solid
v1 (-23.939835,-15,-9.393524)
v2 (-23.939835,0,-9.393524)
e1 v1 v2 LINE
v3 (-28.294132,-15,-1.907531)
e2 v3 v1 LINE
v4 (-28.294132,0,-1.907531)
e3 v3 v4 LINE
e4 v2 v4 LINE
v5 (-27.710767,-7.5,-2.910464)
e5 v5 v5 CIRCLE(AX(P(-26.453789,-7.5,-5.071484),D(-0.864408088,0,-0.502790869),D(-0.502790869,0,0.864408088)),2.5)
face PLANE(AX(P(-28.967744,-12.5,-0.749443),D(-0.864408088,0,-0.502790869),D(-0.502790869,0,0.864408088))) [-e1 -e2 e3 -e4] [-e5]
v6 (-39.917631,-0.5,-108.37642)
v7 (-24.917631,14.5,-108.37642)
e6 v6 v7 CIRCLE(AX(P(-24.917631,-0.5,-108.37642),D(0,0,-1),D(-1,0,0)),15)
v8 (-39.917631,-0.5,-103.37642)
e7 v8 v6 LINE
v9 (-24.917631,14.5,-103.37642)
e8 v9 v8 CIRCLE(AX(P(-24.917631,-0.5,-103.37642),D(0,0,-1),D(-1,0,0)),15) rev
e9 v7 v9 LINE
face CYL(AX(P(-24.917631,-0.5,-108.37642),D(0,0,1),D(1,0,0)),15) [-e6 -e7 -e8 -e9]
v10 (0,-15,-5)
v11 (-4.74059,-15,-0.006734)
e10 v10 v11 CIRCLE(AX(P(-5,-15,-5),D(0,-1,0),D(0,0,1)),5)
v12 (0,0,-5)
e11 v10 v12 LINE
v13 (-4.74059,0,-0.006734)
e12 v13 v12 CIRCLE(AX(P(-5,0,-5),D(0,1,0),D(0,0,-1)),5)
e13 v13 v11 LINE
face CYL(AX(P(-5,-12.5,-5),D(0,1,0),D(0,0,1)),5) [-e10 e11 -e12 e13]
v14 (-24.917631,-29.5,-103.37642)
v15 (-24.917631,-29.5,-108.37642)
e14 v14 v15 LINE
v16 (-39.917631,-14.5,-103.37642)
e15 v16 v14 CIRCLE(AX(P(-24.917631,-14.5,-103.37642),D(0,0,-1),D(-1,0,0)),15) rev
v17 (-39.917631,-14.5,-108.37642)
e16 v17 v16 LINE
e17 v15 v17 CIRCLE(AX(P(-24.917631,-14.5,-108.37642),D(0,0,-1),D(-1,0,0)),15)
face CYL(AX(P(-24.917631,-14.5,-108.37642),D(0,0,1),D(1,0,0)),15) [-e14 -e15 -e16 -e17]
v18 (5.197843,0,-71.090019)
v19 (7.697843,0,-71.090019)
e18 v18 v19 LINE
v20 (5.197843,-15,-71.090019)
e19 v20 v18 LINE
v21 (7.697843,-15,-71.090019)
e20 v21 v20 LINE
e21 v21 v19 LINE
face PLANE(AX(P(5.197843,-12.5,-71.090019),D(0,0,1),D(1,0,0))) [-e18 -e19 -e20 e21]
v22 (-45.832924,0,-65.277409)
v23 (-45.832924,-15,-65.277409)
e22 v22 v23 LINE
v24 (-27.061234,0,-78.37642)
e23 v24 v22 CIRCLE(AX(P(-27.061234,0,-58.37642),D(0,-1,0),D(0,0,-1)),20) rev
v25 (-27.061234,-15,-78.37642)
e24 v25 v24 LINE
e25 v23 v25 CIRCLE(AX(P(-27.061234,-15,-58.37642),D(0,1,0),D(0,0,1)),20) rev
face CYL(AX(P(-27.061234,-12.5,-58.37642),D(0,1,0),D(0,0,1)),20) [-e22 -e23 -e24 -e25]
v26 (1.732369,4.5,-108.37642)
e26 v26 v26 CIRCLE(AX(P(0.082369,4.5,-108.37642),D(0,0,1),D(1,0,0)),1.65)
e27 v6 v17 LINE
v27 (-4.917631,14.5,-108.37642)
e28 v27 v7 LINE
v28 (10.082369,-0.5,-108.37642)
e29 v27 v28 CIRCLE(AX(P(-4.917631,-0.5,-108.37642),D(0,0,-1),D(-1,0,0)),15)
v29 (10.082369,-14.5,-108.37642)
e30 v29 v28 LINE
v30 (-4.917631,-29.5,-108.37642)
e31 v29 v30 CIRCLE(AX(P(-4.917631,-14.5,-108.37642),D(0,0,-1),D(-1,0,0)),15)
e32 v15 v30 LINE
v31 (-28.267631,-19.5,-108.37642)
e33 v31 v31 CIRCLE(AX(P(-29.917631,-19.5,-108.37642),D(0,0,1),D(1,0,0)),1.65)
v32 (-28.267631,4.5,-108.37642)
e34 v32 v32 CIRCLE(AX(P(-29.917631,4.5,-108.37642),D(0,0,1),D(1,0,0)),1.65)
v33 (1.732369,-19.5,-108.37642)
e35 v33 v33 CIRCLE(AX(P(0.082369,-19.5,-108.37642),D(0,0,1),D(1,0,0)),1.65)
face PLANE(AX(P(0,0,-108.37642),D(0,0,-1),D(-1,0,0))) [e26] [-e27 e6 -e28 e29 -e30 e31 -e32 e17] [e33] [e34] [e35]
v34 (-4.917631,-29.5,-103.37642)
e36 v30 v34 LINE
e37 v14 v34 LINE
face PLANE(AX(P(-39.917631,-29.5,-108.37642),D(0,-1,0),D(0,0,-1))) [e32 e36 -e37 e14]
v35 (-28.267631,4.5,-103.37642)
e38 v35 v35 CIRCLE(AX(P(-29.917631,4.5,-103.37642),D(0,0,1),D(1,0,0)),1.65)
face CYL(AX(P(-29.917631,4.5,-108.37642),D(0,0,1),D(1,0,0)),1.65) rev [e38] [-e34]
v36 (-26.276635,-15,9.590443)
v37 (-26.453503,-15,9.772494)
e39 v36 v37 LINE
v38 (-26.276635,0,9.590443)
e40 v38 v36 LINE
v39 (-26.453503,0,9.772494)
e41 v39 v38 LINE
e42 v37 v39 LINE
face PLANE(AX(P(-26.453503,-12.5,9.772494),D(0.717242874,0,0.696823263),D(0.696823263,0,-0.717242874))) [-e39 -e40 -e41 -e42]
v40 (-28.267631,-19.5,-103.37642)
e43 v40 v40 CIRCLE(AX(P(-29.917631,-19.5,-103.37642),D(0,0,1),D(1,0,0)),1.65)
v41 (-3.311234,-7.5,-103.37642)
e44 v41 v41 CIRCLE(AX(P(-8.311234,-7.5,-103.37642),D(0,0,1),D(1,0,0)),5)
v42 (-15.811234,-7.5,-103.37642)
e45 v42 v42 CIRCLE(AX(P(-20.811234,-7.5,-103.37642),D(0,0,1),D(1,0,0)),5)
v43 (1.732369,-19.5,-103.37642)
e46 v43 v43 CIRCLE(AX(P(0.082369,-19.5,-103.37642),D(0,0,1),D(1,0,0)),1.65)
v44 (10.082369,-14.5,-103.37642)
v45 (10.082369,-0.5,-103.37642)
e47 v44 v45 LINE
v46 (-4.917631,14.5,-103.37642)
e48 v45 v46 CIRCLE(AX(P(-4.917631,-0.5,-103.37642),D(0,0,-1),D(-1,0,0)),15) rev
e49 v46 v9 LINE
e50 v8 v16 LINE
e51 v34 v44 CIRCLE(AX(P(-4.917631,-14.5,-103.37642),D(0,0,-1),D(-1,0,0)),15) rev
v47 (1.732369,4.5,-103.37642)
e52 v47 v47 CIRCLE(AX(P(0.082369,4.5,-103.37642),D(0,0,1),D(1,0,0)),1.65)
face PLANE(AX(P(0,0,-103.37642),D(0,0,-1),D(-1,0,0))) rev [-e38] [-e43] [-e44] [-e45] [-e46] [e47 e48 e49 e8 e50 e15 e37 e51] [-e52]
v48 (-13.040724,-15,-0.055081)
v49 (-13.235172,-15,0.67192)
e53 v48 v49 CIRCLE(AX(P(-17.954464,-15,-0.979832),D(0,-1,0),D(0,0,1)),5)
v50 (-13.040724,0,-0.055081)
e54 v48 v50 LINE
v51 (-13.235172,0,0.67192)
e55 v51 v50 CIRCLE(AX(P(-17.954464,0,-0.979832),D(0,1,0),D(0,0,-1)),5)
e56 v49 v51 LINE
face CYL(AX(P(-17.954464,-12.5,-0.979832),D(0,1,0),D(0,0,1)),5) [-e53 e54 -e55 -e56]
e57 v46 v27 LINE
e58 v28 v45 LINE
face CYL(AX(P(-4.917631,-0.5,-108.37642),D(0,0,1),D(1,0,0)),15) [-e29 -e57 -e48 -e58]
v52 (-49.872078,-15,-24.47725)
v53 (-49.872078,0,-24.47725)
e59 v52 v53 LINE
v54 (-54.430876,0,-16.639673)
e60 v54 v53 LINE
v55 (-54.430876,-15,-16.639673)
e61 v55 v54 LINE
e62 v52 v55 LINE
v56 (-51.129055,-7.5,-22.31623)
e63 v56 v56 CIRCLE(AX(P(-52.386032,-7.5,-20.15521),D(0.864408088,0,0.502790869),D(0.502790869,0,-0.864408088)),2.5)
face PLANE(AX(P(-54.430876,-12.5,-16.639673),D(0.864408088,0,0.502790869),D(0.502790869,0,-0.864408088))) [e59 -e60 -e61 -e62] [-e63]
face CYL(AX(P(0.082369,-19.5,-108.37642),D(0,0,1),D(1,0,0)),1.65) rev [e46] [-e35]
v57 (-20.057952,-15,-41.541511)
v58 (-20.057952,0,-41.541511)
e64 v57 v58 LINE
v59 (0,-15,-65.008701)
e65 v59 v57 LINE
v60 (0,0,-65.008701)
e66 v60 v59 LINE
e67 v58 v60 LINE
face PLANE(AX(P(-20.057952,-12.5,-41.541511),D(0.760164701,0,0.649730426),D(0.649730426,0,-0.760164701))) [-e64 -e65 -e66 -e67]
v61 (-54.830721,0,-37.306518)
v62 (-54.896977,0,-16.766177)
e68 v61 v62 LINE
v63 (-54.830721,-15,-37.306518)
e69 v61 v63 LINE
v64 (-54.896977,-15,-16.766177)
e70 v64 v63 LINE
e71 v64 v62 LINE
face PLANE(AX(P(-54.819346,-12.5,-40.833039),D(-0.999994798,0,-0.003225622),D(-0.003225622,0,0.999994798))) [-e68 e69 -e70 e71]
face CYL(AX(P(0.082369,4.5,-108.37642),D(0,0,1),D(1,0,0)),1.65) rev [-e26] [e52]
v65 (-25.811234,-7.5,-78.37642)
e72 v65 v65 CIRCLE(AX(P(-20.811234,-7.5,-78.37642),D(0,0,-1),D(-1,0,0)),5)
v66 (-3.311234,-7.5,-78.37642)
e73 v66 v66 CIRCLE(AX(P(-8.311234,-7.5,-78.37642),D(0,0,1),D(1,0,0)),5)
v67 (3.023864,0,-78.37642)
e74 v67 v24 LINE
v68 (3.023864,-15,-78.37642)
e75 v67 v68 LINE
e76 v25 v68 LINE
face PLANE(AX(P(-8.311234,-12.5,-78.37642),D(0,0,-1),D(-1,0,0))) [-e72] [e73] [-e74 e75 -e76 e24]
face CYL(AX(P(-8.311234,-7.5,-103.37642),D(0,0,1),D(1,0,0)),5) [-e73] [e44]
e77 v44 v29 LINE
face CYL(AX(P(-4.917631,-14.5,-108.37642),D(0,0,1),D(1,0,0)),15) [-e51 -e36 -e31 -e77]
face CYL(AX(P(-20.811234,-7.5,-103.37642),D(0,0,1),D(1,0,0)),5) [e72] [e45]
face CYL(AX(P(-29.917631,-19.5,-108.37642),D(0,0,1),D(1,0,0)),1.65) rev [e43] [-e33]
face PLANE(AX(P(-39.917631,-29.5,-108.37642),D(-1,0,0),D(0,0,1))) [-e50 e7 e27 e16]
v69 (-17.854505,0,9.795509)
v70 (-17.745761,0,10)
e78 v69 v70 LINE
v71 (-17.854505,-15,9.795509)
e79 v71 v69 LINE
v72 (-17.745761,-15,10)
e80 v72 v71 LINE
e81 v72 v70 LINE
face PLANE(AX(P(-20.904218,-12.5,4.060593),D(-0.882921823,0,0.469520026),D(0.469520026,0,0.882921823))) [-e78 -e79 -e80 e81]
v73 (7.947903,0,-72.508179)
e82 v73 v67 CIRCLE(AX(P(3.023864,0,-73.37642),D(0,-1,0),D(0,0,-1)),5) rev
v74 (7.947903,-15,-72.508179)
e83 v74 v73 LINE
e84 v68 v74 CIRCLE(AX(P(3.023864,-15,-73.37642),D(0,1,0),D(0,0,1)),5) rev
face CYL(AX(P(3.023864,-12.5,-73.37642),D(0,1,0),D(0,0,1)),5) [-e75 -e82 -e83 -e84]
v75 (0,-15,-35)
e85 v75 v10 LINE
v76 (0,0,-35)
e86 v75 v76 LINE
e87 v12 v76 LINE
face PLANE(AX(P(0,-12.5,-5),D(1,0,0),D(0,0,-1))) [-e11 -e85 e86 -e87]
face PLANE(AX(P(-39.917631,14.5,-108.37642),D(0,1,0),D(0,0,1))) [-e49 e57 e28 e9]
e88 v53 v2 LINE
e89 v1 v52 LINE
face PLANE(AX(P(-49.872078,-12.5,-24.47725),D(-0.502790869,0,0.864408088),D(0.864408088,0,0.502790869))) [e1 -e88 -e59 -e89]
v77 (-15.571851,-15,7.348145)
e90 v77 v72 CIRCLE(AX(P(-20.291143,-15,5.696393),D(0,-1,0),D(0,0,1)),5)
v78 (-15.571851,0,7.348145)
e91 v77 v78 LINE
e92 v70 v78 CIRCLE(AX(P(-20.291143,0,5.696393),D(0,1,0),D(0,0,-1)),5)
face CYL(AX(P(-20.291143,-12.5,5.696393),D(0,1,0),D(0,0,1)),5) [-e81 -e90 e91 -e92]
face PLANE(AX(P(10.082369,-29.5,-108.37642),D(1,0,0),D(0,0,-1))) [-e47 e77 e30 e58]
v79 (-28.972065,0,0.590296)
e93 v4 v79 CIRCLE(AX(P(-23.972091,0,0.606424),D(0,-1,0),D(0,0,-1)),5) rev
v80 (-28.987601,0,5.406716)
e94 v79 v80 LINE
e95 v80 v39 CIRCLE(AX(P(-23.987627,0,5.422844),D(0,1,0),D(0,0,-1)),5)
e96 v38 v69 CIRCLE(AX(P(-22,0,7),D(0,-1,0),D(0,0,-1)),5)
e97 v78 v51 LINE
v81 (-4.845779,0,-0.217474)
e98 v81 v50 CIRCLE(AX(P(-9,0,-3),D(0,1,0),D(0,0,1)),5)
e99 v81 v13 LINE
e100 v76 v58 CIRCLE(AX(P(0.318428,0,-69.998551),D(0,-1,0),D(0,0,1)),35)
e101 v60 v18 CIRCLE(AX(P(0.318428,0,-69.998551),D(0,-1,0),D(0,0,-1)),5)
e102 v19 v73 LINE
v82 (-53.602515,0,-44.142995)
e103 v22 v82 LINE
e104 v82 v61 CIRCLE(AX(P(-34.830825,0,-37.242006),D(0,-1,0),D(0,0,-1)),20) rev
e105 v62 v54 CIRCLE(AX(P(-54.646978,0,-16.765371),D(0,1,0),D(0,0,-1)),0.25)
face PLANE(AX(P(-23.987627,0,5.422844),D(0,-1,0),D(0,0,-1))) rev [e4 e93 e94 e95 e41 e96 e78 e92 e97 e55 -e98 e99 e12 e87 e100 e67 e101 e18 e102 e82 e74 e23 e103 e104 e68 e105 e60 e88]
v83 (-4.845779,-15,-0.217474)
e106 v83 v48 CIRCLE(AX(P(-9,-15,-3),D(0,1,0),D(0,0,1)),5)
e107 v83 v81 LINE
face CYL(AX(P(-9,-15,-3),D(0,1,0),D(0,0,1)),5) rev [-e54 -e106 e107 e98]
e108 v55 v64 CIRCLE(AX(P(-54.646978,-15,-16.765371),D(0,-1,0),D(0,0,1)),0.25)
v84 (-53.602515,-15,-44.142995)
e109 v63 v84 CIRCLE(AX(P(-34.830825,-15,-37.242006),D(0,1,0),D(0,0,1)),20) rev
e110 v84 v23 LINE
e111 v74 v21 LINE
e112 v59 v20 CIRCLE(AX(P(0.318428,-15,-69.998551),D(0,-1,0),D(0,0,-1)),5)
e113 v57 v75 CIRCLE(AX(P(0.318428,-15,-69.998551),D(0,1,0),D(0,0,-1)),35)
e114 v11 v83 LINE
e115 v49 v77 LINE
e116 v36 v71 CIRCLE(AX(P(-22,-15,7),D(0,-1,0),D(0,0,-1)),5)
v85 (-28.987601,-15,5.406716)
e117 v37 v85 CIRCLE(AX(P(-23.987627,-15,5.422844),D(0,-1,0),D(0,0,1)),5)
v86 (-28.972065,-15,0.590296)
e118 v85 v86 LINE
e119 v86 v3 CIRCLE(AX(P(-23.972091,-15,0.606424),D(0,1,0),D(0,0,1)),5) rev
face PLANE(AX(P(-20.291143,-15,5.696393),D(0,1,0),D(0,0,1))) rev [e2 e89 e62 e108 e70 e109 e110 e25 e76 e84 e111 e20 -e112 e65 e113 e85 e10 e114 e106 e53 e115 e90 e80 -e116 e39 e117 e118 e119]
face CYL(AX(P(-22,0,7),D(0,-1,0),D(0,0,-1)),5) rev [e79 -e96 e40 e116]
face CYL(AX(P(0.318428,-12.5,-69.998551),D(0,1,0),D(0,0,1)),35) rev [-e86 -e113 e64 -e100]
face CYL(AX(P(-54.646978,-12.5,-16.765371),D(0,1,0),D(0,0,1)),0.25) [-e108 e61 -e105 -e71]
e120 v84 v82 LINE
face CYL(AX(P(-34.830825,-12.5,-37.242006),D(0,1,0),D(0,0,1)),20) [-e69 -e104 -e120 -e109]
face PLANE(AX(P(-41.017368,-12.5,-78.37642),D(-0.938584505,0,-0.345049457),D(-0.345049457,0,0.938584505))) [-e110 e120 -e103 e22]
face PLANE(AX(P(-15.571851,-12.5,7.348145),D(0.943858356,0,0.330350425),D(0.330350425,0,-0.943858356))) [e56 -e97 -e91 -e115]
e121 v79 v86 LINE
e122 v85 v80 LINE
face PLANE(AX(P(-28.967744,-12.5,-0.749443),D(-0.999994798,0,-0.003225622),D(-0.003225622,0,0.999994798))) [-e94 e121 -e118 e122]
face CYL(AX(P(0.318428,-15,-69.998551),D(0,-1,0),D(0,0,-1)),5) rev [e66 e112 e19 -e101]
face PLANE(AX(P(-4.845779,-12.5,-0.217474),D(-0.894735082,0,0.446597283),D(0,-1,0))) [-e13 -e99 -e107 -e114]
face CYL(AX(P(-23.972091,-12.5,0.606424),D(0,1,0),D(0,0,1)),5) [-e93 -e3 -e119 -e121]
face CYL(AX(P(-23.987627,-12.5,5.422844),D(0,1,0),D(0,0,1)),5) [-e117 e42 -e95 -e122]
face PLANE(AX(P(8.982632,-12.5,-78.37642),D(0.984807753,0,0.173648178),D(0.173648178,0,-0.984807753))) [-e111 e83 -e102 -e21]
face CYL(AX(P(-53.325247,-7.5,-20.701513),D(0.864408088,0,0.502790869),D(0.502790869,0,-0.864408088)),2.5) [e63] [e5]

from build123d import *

# Parameters (mm, degrees)
SKETCH1_W                      = 5
SKETCH1_H                      = 25
BOSS_EXTRUDE1_DEPTH            = 10
BOSS_EXTRUDE2_DEPTH            = 2.5
BOSS_EXTRUDE3_START            = 2.5
BOSS_EXTRUDE3_DEPTH            = 2.5
SKETCH5_W                      = 50
SKETCH5_H                      = 44
SKETCH5_R                      = 1.65
BOSS_EXTRUDE4_DEPTH            = 5
DRAFT1_ANGLE                   = 60
DRAFT2_ANGLE                   = -10
SKETCH6_W                      = 5
SKETCH6_H                      = 15
SKETCH7_W                      = 5
SKETCH7_H                      = 15
SKETCH8_W                      = 5
SKETCH8_H                      = 25
F_10_0_10_DIAMETER_HOLE1_D     = 10
F_10_0_10_DIAMETER_HOLE1_DEPTH = 29.5
FILLET1_R                      = 5
FILLET2_R                      = 20
FILLET3_R                      = 15


with BuildPart() as part:
    # Sketch1 → Revolve1 (revolve)
    with BuildSketch(Plane(origin=(0, -7.5, 0), x_dir=(1, 0, 0), z_dir=(0, 1, 0))):
        with Locations((-5.811233855, 90.876419512)):
            Rectangle(SKETCH1_W, SKETCH1_H)
    revolve(axis=Axis((-8.311233855, -7.5, -103.376419512), (0, 0, 1)))

    # Sketch2 → Boss-Extrude1 (add)
    with BuildSketch(Plane(origin=(0, -2.5, 0), x_dir=(1, 0, 0), z_dir=(0, 1, 0))):
        with BuildLine():
            Line((-20.904218066, -4.060593221), (-17.745761276, -10))
            ThreePointArc((-17.745761276, -10), (-16.42436709, -8.86625844), (-15.571850751, -7.348145002))
            Line((-15.571850751, -7.348145002), (-13.235172111, -0.671920317))
            ThreePointArc((-13.235172111, -0.671920317), (-13.124251068, -0.312083076), (-13.040724348, 0.055081199))
            ThreePointArc((-13.040724348, 0.055081199), (-9.034250588, -1.999882688), (-5, 0))
            ThreePointArc((-5, 0), (-1.464466094, 1.464466094), (0, 5))
            Line((0, 5), (0, 35))
            ThreePointArc((0, 35), (-10.533604853, 36.723434751), (-20.057952451, 41.541511272))
            Line((-20.057952451, 41.541511272), (5.197843412, 71.090018979))
            Line((5.197843412, 71.090018979), (8.982632418, 71.090018979))
            Line((8.982632418, 71.090018979), (8.982632418, 78.376419512))
            Line((8.982632418, 78.376419512), (-8.311233855, 78.376419512))
            Line((-8.311233855, 78.376419512), (-41.017367582, 78.376419512))
            Line((-41.017367582, 78.376419512), (-54.819345863, 40.83303933))
            Line((-54.819345863, 40.83303933), (-54.896976862, 16.766177236))
            ThreePointArc((-54.896976862, 16.766177236), (-54.712461515, 16.524099343), (-54.430876141, 16.639673113))
            Line((-54.430876141, 16.639673113), (-49.872077715, 24.477250263))
            Line((-49.872077715, 24.477250263), (-8.967847829, 0.684930874))
            Line((-8.967847829, 0.684930874), (-28.967743782, 0.74944331))
            Line((-28.967743782, 0.74944331), (-28.987601327, -5.406715976))
            ThreePointArc((-28.987601327, -5.406715976), (-28.311946244, -7.932877153), (-26.453503439, -9.772494077))
            Line((-26.453503439, -9.772494077), (-20.904218066, -4.060593221))
        make_face()
    extrude(amount=-BOSS_EXTRUDE1_DEPTH)

    # Sketch3 → Boss-Extrude2 (add)
    with BuildSketch(Plane.XZ.offset(12.5)):
        with BuildLine():
            Line((-20.904218066, 4.060593221), (-17.745761276, 10))
            ThreePointArc((-17.745761276, 10), (-16.42436709, 8.86625844), (-15.571850751, 7.348145002))
            Line((-15.571850751, 7.348145002), (-13.235172111, 0.671920317))
            ThreePointArc((-13.235172111, 0.671920317), (-13.124251068, 0.312083076), (-13.040724348, -0.055081199))
            ThreePointArc((-13.040724348, -0.055081199), (-9.034250588, 1.999882688), (-5, 0))
            ThreePointArc((-5, 0), (-1.464466094, -1.464466094), (0, -5))
            Line((0, -5), (0, -35))
            ThreePointArc((0, -35), (-10.533604853, -36.723434751), (-20.057952451, -41.541511272))
            Line((-20.057952451, -41.541511272), (5.197843412, -71.090018979))
            Line((5.197843412, -71.090018979), (8.982632418, -71.090018979))
            Line((8.982632418, -71.090018979), (8.982632418, -78.376419512))
            Line((8.982632418, -78.376419512), (-41.017367582, -78.376419512))
            Line((-41.017367582, -78.376419512), (-54.819345863, -40.83303933))
            Line((-54.819345863, -40.83303933), (-54.896976862, -16.766177236))
            ThreePointArc((-54.896976862, -16.766177236), (-54.712461515, -16.524099343), (-54.430876141, -16.639673113))
            Line((-54.430876141, -16.639673113), (-49.872077715, -24.477250263))
            Line((-49.872077715, -24.477250263), (-8.967847829, -0.684930874))
            Line((-8.967847829, -0.684930874), (-28.967743782, -0.74944331))
            Line((-28.967743782, -0.74944331), (-28.987601327, 5.406715976))
            ThreePointArc((-28.987601327, 5.406715976), (-28.311946244, 7.932877153), (-26.453503439, 9.772494077))
            Line((-26.453503439, 9.772494077), (-20.904218066, 4.060593221))
        make_face()
    extrude(amount=BOSS_EXTRUDE2_DEPTH)

    # Sketch4 → Boss-Extrude3 (add)
    with BuildSketch(Plane(origin=(0, -2.5, 0), x_dir=(-1, 0, 0), z_dir=(0, 1, 0)).offset(BOSS_EXTRUDE3_START)):
        with BuildLine():
            Line((20.904218066, 4.060593221), (26.453503439, 9.772494077))
            ThreePointArc((26.453503439, 9.772494077), (28.311946244, 7.932877153), (28.987601327, 5.406715976))
            Line((28.987601327, 5.406715976), (28.967743782, -0.74944331))
            Line((28.967743782, -0.74944331), (8.967847829, -0.684930874))
            Line((8.967847829, -0.684930874), (49.872077715, -24.477250263))
            Line((49.872077715, -24.477250263), (54.430876141, -16.639673113))
            ThreePointArc((54.430876141, -16.639673113), (54.712461515, -16.524099343), (54.896976862, -16.766177236))
            Line((54.896976862, -16.766177236), (54.819345863, -40.83303933))
            Line((54.819345863, -40.83303933), (41.017367582, -78.376419512))
            Line((41.017367582, -78.376419512), (-8.982632418, -78.376419512))
            Line((-8.982632418, -78.376419512), (-8.982632418, -71.090018979))
            Line((-8.982632418, -71.090018979), (-5.197843412, -71.090018979))
            Line((-5.197843412, -71.090018979), (20.057952451, -41.541511272))
            ThreePointArc((20.057952451, -41.541511272), (10.533604853, -36.723434751), (0, -35))
            Line((0, -35), (0, -5))
            ThreePointArc((0, -5), (1.464466094, -1.464466094), (5, 0))
            ThreePointArc((5, 0), (9.034250588, 1.999882688), (13.040724348, -0.055081199))
            ThreePointArc((13.040724348, -0.055081199), (13.124251068, 0.312083076), (13.235172111, 0.671920317))
            Line((13.235172111, 0.671920317), (15.571850751, 7.348145002))
            ThreePointArc((15.571850751, 7.348145002), (16.42436709, 8.86625844), (17.745761276, 10))
            Line((17.745761276, 10), (20.904218066, 4.060593221))
        make_face()
    extrude(amount=-BOSS_EXTRUDE3_DEPTH)

    # Sketch5 → Boss-Extrude4 (add)
    with BuildSketch(Plane.XY.offset(-103.376419512)):
        with Locations((-14.91763051, -7.5)):
            Rectangle(SKETCH5_W, SKETCH5_H)
        with Locations((-29.91763051, -19.5)):
            Circle(SKETCH5_R, mode=Mode.SUBTRACT)
        with Locations((0.08236949, -19.5)):
            Circle(SKETCH5_R, mode=Mode.SUBTRACT)
        with Locations((0.08236949, 4.5)):
            Circle(SKETCH5_R, mode=Mode.SUBTRACT)
        with Locations((-29.91763051, 4.5)):
            Circle(SKETCH5_R, mode=Mode.SUBTRACT)
    extrude(amount=-BOSS_EXTRUDE4_DEPTH)

    # Draft1
    draft1_faces = [part.faces().sort_by_distance(p)[0] for p in [
        (-18.967795805, -7.5, -0.717187092),
    ]]
    draft(draft1_faces, Plane(origin=(-28.967743782, -12.5, -0.74944331), x_dir=(0.0032256218002524395, 0, -0.9999947976684688), z_dir=(-0.9999947976684688, 0, -0.0032256218002524395)), DRAFT1_ANGLE)

    # Draft2
    draft2_faces = [part.faces().sort_by_distance(p)[0] for p in [
        (8.982632418, -7.5, -74.733219246),
    ]]
    draft(draft2_faces, Plane(origin=(-8.311233855, -12.5, -78.376419512), x_dir=(-1, 0, 0), z_dir=(0, 0, -1)), DRAFT2_ANGLE)

    # Sketch6 → Cut-Revolve1 (revolve, cut)
    with BuildSketch(Plane.XY.offset(7)):
        with Locations((-19.5, -7.5)):
            Rectangle(SKETCH6_W, SKETCH6_H)
    revolve(axis=Axis((-22, 0, 7), (0, -1, 0)), mode=Mode.SUBTRACT)

    # Sketch7 → Cut-Revolve2 (revolve, cut)
    with BuildSketch(Plane(origin=(0, 0, -3), x_dir=(-1, 0, 0), z_dir=(0, 0, -1))):
        with Locations((6.5, -7.5)):
            Rectangle(SKETCH7_W, SKETCH7_H)
    revolve(axis=Axis((-9, -15, -3), (0, 1, 0)), mode=Mode.SUBTRACT)

    # Sketch8 → Revolve2 (revolve)
    with BuildSketch(Plane(origin=(0, -7.5, 0), x_dir=(1, 0, 0), z_dir=(0, 1, 0))):
        with Locations((-18.311233855, 90.876419512)):
            Rectangle(SKETCH8_W, SKETCH8_H)
    revolve(axis=Axis((-20.811233855, -7.5, -103.376419512), (0, 0, 1)))

    # Sketch9 → Revolve3 (revolve)
    with BuildSketch(Plane(origin=(0, -7.5, 0), x_dir=(1, 0, 0), z_dir=(0, 1, 0))):
        Polygon((-51.129054889, 22.316230044), (-52.386032062, 20.155209826), (-26.453789436, 5.071483748), (-25.196812263, 7.232503967), align=None)
    revolve(axis=Axis((-53.325247092, -7.5, -20.701512837), (0.8644080875330462, 0, 0.502790869256256)))

    # Ø10.0 (10) Diameter Hole1
    with Locations(Plane(origin=(0, -15, 0), x_dir=(-1, 0, 0), z_dir=(0, -1, 0))):
        with Locations((-0.318427602, 69.998551454)):
            Hole(F_10_0_10_DIAMETER_HOLE1_D / 2, depth=F_10_0_10_DIAMETER_HOLE1_DEPTH)

    # Chamfer1
    # the kernel refuses this chamfer: 0.262951912, 0.262770817 mm, written as the material it takes off along each edge
    with BuildSketch(Plane(origin=(-5, -15.679311202, 0), x_dir=(0.9996632496701223, 4.862291359988254e-15, -0.02594970633688609), z_dir=(0, 1, 0))) as chamfer1_piece_1:
        with BuildLine():
            Line((0.259497063, 0), (0.159812325, 0.213399124))
            ThreePointArc((0.159812325, 0.213399124), (0.082816569, 0.107621918), (0, 0))
            ThreePointArc((0, 0), (0.131972937, -0.001683257), (0.259497063, 0))
        make_face()
    extrude(amount=16.358622404, mode=Mode.SUBTRACT)

    # Fillet1
    fillet1_edges = [part.edges().sort_by_distance(p)[0] for p in [
        (-28.967743782, -7.5, -0.74944331),
        (8.982632418, -7.5, -78.376419512),
    ]]
    fillet(fillet1_edges, radius=FILLET1_R)

    # Fillet2
    fillet2_edges = [part.edges().sort_by_distance(p)[0] for p in [
        (-41.017367582, -7.5, -78.376419512),
        (-54.819345863, -7.5, -40.83303933),
    ]]
    fillet(fillet2_edges, radius=FILLET2_R)

    # Fillet3
    fillet3_edges = [part.edges().sort_by_distance(p)[0] for p in [
        (-39.91763051, -29.5, -105.876419512),
        (-39.91763051, 14.5, -105.876419512),
        (10.08236949, 14.5, -105.876419512),
        (10.08236949, -29.5, -105.876419512),
    ]]
    fillet(fillet3_edges, radius=FILLET3_R)


solid = part.part
